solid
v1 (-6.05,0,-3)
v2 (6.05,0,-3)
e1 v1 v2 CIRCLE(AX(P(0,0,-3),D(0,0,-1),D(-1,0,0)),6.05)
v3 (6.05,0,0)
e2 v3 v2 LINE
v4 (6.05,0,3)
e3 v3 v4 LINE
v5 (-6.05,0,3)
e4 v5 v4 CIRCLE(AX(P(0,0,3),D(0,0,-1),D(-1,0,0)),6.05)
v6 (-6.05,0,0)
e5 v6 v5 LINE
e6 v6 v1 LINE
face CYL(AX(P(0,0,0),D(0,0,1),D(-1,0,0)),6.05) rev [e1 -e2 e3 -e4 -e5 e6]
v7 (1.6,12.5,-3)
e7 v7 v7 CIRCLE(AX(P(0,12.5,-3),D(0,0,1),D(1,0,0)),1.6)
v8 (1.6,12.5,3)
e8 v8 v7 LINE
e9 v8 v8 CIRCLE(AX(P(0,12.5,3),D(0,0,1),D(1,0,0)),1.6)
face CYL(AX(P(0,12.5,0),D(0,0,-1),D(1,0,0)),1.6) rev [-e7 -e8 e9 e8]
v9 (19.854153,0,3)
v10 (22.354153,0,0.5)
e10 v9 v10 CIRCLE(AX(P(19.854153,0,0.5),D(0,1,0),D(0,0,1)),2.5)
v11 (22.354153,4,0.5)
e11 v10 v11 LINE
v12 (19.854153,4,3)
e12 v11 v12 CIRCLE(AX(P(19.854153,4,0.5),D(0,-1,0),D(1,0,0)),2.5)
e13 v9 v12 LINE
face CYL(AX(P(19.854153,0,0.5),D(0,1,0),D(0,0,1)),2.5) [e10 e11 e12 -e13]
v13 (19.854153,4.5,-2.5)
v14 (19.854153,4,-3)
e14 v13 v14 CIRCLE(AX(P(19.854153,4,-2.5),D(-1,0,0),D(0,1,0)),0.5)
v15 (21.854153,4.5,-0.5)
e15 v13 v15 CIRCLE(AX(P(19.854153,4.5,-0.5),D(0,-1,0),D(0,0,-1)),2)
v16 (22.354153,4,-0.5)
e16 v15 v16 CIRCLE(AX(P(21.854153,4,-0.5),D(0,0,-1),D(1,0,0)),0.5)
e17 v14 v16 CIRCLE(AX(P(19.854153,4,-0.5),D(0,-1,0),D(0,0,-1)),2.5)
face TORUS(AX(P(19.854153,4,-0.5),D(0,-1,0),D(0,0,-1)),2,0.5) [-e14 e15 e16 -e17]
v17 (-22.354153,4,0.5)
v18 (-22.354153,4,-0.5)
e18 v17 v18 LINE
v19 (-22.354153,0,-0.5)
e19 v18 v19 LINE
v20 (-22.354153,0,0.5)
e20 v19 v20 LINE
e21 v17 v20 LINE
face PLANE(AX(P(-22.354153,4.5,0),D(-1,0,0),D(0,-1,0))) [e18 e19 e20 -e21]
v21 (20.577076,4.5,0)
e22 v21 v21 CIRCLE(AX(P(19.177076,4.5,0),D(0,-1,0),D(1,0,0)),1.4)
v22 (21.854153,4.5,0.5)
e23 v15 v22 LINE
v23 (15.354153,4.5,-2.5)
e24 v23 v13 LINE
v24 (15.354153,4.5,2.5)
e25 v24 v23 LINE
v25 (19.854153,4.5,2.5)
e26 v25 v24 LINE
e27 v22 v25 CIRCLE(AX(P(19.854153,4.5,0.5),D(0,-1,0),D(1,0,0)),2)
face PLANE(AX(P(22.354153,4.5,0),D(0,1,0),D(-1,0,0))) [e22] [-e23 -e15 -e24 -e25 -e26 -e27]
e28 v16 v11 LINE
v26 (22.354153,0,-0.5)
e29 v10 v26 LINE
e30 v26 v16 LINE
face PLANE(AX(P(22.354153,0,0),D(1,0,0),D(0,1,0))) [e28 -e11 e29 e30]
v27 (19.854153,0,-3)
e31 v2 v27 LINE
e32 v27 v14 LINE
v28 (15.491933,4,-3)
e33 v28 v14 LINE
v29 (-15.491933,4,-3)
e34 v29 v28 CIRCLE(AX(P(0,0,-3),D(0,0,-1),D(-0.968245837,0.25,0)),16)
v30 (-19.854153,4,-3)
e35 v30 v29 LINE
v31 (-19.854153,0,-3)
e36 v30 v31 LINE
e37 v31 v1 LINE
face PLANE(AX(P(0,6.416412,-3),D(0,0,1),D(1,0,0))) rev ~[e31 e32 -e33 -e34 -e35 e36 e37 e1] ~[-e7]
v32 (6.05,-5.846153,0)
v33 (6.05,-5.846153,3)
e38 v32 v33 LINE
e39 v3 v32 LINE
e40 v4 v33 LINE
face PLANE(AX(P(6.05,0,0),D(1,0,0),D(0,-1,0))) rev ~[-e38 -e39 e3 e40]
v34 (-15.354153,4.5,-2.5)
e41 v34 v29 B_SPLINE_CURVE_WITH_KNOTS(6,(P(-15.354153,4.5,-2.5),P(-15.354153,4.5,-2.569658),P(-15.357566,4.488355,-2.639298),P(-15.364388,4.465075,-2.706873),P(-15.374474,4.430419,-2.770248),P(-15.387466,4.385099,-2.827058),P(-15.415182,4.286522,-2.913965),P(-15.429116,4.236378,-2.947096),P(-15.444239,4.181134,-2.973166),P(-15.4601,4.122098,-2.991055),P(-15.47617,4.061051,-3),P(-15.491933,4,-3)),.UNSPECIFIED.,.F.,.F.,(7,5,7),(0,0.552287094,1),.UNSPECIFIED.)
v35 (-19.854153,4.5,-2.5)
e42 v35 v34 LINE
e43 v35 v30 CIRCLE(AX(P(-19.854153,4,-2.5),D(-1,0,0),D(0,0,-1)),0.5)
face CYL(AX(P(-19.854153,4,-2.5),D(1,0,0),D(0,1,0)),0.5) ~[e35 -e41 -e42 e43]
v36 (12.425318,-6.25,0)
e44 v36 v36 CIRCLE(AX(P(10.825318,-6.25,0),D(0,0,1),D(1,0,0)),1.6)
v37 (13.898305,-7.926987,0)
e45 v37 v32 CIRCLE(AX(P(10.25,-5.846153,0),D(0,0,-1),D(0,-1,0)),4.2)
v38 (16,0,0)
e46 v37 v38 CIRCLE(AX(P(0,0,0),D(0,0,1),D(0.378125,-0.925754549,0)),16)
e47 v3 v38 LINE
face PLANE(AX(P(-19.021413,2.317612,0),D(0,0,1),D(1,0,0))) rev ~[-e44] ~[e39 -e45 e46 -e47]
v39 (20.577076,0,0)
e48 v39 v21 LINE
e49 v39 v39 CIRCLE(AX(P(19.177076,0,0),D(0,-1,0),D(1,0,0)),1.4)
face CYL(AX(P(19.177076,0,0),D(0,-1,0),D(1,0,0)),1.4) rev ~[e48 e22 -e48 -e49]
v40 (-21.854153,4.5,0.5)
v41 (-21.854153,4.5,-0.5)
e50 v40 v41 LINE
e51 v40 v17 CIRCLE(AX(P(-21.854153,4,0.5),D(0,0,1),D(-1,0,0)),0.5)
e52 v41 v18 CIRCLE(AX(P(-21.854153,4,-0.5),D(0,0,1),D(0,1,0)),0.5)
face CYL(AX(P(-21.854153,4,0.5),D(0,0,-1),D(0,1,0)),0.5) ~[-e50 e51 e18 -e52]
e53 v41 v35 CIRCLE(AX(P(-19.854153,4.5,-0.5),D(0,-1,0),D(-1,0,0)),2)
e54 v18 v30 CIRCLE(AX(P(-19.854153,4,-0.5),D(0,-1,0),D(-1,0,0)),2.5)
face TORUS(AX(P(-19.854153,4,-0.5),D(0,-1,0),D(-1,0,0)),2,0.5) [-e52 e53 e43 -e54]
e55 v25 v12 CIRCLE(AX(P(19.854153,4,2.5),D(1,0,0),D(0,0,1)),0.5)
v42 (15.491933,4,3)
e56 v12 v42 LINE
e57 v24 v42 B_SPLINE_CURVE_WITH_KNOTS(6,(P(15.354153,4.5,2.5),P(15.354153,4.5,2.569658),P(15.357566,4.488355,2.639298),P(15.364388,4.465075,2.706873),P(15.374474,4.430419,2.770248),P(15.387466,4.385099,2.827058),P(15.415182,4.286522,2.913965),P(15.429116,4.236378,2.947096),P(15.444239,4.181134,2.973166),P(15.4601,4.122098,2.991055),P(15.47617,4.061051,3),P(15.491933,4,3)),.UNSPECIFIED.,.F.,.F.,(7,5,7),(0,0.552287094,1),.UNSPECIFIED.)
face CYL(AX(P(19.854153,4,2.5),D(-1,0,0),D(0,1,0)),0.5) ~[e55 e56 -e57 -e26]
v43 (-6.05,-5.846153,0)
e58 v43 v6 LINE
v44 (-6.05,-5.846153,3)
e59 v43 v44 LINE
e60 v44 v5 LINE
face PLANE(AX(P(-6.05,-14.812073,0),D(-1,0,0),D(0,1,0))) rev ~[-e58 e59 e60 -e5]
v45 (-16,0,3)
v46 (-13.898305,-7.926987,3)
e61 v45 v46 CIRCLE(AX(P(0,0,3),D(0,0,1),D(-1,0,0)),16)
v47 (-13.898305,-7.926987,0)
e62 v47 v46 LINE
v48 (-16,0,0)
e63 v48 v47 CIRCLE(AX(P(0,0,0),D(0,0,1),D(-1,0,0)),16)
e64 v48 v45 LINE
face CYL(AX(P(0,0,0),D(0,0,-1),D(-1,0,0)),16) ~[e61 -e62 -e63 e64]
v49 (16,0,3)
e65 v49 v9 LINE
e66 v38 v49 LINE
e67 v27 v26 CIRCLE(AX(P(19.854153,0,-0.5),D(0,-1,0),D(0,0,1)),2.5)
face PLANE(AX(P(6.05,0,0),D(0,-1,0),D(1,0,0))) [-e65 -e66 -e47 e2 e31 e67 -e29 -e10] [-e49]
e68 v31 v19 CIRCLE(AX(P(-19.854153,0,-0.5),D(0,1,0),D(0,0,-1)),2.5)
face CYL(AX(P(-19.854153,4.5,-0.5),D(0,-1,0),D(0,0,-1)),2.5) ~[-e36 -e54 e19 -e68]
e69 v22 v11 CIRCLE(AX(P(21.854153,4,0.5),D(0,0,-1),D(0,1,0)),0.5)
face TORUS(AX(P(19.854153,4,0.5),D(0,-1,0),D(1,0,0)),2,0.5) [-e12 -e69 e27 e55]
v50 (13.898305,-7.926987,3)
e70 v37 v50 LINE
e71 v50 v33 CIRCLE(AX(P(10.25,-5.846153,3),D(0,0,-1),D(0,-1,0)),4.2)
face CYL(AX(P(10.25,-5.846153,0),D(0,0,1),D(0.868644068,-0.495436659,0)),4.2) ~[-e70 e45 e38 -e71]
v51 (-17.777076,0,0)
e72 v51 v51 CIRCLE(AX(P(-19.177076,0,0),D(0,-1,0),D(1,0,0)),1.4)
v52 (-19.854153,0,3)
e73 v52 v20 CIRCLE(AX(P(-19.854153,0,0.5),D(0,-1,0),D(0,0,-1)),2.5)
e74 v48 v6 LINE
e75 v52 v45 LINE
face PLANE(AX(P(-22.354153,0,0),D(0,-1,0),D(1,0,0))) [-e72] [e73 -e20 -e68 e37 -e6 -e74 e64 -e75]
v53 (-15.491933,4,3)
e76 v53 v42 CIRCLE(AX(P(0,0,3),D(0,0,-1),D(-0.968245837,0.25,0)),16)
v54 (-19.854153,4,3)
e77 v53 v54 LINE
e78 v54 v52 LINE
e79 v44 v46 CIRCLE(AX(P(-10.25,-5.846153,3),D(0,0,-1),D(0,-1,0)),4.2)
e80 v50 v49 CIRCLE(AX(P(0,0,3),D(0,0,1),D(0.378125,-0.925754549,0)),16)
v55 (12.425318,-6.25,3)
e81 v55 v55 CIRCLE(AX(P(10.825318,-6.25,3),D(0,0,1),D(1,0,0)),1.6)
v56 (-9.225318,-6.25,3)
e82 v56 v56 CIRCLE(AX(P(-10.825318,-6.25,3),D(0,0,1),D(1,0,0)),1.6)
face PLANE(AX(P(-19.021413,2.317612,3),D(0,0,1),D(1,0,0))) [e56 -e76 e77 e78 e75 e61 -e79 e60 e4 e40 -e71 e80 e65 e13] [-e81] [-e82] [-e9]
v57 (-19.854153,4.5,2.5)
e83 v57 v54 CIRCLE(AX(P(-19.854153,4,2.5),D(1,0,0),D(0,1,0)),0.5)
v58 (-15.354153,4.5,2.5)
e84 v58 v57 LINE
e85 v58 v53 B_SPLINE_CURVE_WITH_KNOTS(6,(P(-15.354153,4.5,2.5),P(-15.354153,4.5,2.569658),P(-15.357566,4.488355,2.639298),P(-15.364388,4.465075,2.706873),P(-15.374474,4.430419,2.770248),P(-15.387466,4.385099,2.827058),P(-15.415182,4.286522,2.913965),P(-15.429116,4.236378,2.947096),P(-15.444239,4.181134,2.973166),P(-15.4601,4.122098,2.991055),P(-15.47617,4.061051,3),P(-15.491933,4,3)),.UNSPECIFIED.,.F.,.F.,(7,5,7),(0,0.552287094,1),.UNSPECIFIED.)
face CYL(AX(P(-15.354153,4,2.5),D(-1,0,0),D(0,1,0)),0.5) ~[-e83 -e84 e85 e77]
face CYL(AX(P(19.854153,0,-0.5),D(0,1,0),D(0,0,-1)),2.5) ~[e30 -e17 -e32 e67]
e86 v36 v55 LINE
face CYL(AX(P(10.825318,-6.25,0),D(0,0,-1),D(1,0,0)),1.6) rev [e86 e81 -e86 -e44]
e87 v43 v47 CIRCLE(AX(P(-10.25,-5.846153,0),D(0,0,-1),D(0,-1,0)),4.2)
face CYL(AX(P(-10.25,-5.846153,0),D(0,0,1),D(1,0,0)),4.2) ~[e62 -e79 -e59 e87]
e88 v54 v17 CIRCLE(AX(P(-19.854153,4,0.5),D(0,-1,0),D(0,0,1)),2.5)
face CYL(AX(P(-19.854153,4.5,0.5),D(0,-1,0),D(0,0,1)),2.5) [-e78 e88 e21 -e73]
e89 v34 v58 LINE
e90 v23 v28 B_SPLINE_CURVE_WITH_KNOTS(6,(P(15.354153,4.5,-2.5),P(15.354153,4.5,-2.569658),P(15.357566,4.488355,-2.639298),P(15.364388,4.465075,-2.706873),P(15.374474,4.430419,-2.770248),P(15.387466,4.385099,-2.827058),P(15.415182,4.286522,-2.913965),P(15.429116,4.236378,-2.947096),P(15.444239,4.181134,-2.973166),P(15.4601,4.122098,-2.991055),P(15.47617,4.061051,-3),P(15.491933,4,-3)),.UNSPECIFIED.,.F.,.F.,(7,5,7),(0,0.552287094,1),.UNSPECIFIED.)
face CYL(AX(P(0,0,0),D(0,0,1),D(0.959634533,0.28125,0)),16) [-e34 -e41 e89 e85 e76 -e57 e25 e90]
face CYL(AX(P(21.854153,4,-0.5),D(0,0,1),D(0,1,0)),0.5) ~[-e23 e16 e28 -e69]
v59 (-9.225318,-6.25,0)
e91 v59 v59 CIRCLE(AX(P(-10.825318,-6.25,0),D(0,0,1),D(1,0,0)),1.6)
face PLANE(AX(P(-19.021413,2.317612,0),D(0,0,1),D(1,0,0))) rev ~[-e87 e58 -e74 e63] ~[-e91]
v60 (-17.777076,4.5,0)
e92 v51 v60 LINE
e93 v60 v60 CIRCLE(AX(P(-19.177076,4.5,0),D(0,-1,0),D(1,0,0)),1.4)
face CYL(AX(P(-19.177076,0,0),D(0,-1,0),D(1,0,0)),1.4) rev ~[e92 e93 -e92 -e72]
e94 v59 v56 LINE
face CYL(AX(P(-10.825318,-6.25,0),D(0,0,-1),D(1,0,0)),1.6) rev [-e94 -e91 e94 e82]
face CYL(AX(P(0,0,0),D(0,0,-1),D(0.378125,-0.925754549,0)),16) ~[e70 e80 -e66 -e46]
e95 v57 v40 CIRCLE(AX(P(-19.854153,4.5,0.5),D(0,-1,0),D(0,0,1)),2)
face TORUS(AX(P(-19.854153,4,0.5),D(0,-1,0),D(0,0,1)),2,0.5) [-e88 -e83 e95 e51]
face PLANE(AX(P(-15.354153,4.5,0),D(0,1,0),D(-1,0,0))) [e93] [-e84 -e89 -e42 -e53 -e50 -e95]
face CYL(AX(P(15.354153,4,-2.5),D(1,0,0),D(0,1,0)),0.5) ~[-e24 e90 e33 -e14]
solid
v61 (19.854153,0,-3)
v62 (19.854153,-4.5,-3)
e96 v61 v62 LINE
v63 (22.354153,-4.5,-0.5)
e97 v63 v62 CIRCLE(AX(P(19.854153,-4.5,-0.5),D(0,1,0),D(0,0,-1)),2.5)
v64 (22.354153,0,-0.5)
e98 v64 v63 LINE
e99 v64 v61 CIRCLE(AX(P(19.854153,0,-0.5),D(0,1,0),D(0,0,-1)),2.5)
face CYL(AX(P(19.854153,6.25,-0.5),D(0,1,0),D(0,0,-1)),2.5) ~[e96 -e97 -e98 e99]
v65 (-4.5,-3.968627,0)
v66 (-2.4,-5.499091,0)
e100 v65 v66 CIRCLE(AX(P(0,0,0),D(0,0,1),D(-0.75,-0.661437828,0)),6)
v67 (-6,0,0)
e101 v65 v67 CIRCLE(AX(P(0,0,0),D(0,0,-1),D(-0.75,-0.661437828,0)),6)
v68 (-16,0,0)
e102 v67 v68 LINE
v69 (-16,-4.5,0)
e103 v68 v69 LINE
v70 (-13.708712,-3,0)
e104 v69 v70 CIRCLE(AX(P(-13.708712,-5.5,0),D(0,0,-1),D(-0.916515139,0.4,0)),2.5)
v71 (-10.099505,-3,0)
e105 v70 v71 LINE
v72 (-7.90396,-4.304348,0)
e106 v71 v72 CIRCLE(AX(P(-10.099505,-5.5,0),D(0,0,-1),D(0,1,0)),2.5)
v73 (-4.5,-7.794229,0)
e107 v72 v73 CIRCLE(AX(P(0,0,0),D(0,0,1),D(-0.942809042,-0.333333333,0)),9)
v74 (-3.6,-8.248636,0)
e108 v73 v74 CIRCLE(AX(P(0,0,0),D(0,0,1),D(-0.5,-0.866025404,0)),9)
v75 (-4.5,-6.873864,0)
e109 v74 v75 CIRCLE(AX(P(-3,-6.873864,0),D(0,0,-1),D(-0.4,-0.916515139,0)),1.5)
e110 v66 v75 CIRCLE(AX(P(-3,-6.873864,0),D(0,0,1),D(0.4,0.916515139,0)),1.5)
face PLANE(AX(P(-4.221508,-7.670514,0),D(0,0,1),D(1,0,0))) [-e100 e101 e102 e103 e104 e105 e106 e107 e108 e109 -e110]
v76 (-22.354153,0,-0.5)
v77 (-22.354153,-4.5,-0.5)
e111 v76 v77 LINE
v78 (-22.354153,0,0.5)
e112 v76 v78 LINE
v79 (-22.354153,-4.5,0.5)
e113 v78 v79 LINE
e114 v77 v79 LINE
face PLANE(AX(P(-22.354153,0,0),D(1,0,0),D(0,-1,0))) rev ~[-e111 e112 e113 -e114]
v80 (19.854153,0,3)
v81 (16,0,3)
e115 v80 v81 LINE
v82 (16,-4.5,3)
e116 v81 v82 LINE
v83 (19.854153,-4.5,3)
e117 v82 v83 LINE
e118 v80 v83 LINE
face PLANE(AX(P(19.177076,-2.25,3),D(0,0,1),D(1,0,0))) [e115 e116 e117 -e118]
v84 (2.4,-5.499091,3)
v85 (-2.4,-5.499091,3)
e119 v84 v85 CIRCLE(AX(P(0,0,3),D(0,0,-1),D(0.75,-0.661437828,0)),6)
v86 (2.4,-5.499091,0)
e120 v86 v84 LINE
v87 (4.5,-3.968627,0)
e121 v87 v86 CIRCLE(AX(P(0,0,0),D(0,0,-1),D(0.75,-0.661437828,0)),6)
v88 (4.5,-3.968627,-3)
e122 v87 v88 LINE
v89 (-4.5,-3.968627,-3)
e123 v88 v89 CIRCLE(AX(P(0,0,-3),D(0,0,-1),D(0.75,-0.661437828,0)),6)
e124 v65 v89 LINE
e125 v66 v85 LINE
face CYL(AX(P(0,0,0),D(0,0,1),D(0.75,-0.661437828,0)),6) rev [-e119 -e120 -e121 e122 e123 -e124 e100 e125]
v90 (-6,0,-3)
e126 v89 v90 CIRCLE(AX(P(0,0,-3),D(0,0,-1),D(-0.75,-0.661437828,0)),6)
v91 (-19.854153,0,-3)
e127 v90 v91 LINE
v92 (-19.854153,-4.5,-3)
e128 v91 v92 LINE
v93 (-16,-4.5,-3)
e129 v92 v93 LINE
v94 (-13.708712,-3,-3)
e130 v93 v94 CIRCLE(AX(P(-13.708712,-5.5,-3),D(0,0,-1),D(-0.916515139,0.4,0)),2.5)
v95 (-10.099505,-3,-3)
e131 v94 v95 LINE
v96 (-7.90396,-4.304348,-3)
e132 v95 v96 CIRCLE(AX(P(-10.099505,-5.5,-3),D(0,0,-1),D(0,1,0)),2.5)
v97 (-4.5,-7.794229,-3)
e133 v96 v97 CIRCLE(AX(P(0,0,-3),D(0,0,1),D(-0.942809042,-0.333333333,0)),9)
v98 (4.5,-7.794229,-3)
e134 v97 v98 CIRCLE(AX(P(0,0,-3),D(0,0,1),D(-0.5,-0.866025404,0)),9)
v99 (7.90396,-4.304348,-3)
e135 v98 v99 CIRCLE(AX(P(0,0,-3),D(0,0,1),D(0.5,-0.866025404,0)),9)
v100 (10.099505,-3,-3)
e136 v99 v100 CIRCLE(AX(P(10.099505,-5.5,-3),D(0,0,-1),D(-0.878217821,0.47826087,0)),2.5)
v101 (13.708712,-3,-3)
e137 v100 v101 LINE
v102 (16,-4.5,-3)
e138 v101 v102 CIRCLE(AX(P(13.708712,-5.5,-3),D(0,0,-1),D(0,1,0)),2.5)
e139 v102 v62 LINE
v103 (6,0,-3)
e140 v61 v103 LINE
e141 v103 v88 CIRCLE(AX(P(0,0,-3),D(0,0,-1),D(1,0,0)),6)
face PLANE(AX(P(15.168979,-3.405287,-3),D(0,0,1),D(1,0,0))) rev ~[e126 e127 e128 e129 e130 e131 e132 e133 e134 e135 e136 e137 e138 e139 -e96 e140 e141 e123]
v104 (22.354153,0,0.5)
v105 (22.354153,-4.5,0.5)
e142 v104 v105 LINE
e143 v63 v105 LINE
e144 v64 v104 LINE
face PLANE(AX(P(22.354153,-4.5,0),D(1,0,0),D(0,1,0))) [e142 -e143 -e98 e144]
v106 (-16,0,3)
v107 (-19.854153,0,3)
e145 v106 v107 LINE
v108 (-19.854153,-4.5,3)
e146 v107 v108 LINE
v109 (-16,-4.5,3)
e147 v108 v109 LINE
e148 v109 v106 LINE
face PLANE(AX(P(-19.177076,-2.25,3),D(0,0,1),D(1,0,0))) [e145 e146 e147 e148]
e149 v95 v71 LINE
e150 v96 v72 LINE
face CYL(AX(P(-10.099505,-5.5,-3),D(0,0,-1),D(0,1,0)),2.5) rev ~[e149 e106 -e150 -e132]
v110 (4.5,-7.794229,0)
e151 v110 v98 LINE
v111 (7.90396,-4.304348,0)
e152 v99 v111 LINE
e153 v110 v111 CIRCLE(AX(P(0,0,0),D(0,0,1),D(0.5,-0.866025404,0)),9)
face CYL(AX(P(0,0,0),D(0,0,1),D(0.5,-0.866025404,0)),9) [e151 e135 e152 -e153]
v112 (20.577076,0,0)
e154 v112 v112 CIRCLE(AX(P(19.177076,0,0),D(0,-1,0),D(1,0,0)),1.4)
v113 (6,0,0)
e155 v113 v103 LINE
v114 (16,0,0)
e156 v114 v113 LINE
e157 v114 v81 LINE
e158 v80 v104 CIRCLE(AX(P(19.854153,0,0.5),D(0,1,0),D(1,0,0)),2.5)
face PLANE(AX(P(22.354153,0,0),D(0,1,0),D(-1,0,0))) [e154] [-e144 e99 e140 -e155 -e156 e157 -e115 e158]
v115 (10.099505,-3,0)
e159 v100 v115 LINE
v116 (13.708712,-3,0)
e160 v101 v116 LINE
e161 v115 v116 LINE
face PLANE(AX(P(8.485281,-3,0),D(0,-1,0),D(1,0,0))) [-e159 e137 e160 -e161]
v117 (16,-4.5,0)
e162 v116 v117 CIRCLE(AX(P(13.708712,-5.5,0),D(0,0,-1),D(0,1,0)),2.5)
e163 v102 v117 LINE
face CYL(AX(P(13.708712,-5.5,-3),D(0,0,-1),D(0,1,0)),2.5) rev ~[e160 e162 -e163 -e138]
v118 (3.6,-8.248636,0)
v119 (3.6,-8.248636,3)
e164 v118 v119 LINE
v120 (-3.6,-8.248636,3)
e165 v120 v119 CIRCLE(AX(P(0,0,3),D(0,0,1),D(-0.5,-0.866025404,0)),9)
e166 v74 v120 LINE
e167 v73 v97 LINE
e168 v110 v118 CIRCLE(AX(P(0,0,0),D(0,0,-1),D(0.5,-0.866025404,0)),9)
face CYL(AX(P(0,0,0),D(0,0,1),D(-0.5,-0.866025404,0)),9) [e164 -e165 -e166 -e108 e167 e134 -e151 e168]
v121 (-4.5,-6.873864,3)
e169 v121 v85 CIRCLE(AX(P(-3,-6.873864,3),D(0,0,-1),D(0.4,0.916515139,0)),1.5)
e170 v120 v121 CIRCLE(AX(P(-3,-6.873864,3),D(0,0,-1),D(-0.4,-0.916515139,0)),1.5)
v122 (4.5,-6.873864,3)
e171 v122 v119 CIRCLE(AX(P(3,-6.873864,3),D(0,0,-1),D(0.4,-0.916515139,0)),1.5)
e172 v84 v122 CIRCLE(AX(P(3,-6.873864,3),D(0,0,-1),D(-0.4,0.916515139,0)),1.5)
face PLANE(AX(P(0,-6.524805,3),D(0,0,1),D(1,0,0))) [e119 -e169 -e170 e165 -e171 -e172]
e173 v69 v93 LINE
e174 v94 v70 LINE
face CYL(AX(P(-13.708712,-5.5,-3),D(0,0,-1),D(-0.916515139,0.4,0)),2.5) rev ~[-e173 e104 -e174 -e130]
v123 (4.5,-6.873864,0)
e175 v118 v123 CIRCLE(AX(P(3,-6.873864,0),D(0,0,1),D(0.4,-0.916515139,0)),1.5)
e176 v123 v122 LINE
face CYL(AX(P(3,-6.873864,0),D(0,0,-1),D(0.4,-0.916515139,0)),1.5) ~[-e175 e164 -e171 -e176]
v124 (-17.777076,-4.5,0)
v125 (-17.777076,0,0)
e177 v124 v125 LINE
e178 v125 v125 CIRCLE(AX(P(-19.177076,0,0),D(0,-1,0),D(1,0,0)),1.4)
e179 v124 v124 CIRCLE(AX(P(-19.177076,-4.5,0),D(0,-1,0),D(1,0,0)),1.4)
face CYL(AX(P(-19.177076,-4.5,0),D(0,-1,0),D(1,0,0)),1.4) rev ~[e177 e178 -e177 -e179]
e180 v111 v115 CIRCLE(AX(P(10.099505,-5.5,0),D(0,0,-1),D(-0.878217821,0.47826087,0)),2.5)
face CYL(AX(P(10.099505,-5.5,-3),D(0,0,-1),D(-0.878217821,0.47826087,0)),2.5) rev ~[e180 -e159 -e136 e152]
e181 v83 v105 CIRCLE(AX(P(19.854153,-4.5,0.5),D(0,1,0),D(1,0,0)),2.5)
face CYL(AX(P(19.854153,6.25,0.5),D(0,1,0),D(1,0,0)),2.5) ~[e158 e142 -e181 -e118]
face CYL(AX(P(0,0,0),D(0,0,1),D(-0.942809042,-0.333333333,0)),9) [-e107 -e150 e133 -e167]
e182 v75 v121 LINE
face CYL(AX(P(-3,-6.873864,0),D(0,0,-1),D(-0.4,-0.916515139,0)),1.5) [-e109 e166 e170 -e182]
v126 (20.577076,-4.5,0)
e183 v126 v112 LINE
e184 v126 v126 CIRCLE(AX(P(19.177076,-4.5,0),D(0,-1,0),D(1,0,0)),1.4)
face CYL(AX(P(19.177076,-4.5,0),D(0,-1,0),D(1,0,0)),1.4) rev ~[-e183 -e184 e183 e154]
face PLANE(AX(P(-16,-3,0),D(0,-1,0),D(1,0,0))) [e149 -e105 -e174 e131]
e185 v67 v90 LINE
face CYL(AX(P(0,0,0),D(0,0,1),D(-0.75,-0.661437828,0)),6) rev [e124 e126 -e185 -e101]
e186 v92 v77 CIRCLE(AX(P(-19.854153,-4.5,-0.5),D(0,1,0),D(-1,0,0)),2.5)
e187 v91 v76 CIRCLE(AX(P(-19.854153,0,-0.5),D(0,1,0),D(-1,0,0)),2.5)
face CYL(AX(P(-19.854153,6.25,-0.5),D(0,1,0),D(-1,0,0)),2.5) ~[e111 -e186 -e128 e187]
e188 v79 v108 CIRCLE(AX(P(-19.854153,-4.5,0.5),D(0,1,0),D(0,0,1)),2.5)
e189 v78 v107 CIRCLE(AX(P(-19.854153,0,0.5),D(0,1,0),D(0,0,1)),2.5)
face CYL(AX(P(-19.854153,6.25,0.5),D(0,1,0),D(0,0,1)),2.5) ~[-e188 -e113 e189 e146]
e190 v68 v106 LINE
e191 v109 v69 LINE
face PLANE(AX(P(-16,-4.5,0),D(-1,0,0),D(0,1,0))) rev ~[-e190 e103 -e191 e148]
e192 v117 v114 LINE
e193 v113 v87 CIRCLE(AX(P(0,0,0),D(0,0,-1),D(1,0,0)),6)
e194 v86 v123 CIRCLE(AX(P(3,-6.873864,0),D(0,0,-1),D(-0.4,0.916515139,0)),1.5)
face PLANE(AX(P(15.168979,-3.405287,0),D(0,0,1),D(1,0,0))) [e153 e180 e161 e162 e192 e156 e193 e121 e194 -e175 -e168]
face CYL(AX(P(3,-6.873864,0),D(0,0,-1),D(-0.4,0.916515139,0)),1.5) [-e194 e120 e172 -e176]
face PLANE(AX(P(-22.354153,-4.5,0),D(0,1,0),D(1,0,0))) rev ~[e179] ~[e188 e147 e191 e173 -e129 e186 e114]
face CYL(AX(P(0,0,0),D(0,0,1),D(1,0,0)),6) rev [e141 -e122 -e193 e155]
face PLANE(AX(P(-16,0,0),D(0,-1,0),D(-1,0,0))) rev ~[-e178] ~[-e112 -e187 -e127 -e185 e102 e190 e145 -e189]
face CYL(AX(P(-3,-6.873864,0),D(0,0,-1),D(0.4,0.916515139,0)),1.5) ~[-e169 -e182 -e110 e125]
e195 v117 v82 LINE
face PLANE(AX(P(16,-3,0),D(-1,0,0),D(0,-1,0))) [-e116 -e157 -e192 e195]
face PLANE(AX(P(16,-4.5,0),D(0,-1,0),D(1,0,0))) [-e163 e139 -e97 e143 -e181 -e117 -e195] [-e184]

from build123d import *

# Parameters (mm, degrees)
F0_R          = 1.6
F1_DEPTH      = 3
F2_DEPTH      = 3
F3_R          = 1.4
F4_DEPTH      = 16.001
F5_R          = 2.5
F6_R          = 0.5
F7_R          = 4.2
F9_DEPTH      = 3
F10_DEPTH     = 3
F11_R         = 1.4
F12_DEPTH     = 25
F13_T1_DEPTH  = 3
F13_T3_DEPTH  = 3
F13_T5_DEPTH  = 3
F13_T7_DEPTH  = 3
F13_T9_DEPTH  = 17
F13_T11_DEPTH = 17
F13_T13_DEPTH = 17
F13_T15_DEPTH = 17
F14_T1_DEPTH  = 10.2630914396
F14_T3_DEPTH  = 5.5205236091


# Not quite as in the source:
# - a fillet or chamfer that OpenCascade refuses, or shapes differently, is made with other operations: its cross-section is extruded or revolved along the edge and cut away or added


with BuildPart() as f1:
    # F0 (on Top) → F1 (new body)
    with BuildSketch(Plane.XY):
        with BuildLine():
            ThreePointArc((-16, 0), (-15.8377151213, 2.273055155), (-15.3541525328, 4.5))
            Line((-15.3541525328, 4.5), (-22.3541525328, 4.5))
            Line((-22.3541525328, 4.5), (-22.3541525328, 0))
            Line((-22.3541525328, 0), (-16, 0))
        make_face()
        with BuildLine():
            Line((7.65, 0), (16, 0))
            ThreePointArc((16, 0), (15.8377151213, 2.273055155), (15.3541525328, 4.5))
            ThreePointArc((15.3541525328, 4.5), (0, 16), (-15.3541525328, 4.5))
            ThreePointArc((-15.3541525328, 4.5), (-15.8377151213, 2.273055155), (-16, 0))
            Line((-16, 0), (-7.65, 0))
            ThreePointArc((-7.65, 0), (0, 7.65), (7.65, 0))
        make_face()
        with Locations((0, 12.5)):
            Circle(F0_R, mode=Mode.SUBTRACT)
        with BuildLine():
            ThreePointArc((-6.05, 0), (0, 6.05), (6.05, 0))
            Line((6.05, 0), (7.65, 0))
            ThreePointArc((7.65, 0), (0, 7.65), (-7.65, 0))
            Line((-7.65, 0), (-6.05, 0))
        make_face()
        with BuildLine():
            ThreePointArc((15.3541525328, 4.5), (15.8377151213, 2.273055155), (16, 0))
            Line((16, 0), (22.3541525328, 0))
            Line((22.3541525328, 0), (22.3541525328, 4.5))
            Line((22.3541525328, 4.5), (15.3541525328, 4.5))
        make_face()
        with BuildLine():
            Line((-6.05, -14.8120727786), (-6.05, 0))
            Line((-6.05, 0), (-7.65, 0))
            Line((-7.65, 0), (-16, 0))
            ThreePointArc((-16, 0), (-13.2815661727, -8.9218832093), (-6.05, -14.8120727786))
        make_face()
        with Locations((-10.8253175473, -6.25)):
            Circle(F0_R, mode=Mode.SUBTRACT)
        with BuildLine():
            Line((6.05, 0), (6.05, -14.8120727786))
            ThreePointArc((6.05, -14.8120727786), (13.2815661727, -8.9218832093), (16, 0))
            Line((16, 0), (7.65, 0))
            Line((7.65, 0), (6.05, 0))
        make_face()
        with Locations((10.8253175473, -6.25)):
            Circle(F0_R, mode=Mode.SUBTRACT)
    extrude(amount=F1_DEPTH)

    # F0 (on Top) → F2 (join)
    with BuildSketch(Plane.XY):
        with BuildLine():
            Line((7.65, 0), (16, 0))
            ThreePointArc((16, 0), (15.8377151213, 2.273055155), (15.3541525328, 4.5))
            ThreePointArc((15.3541525328, 4.5), (0, 16), (-15.3541525328, 4.5))
            ThreePointArc((-15.3541525328, 4.5), (-15.8377151213, 2.273055155), (-16, 0))
            Line((-16, 0), (-7.65, 0))
            ThreePointArc((-7.65, 0), (0, 7.65), (7.65, 0))
        make_face()
        with Locations((0, 12.5)):
            Circle(F0_R, mode=Mode.SUBTRACT)
        with BuildLine():
            ThreePointArc((-6.05, 0), (0, 6.05), (6.05, 0))
            Line((6.05, 0), (7.65, 0))
            ThreePointArc((7.65, 0), (0, 7.65), (-7.65, 0))
            Line((-7.65, 0), (-6.05, 0))
        make_face()
        with BuildLine():
            ThreePointArc((15.3541525328, 4.5), (15.8377151213, 2.273055155), (16, 0))
            Line((16, 0), (22.3541525328, 0))
            Line((22.3541525328, 0), (22.3541525328, 4.5))
            Line((22.3541525328, 4.5), (15.3541525328, 4.5))
        make_face()
        with BuildLine():
            ThreePointArc((-16, 0), (-15.8377151213, 2.273055155), (-15.3541525328, 4.5))
            Line((-15.3541525328, 4.5), (-22.3541525328, 4.5))
            Line((-22.3541525328, 4.5), (-22.3541525328, 0))
            Line((-22.3541525328, 0), (-16, 0))
        make_face()
    extrude(amount=-F2_DEPTH)

    # F3 (on face) → F4 (cut, through all)
    with BuildSketch(Plane.XZ):
        with Locations((19.1770762664, 0)):
            Circle(F3_R)
        with Locations((-19.1770762664, 0)):
            Circle(F3_R)
    extrude(amount=-F4_DEPTH, mode=Mode.SUBTRACT)

    # F5
    f5_edges = [f1.edges().sort_by_distance(p)[0] for p in [
        (-22.354153, 2.25, 3),
        (22.354153, 2.25, 3),
        (-22.354153, 2.25, -3),
        (22.354153, 2.25, -3),
    ]]
    fillet(f5_edges, radius=F5_R)

    # F6
    f6_edges = [f1.edges().sort_by_distance(p)[0] for p in [
        (-17.604153, 4.5, 3),
        (17.604153, 4.5, 3),
        (-21.621919, 4.5, 2.267767),
        (-22.354153, 4.5, 0),
        (-17.604153, 4.5, -3),
        (-21.621919, 4.5, -2.267767),
        (17.604153, 4.5, -3),
        (22.354153, 4.5, 0),
        (21.621919, 4.5, 2.267767),
        (21.621919, 4.5, -2.267767),
    ]]
    fillet(f6_edges, radius=F6_R)

    # F7
    f7_edges = [f1.edges().sort_by_distance(p)[0] for p in [
        (-6.05, -14.812073, 1.5),
        (6.05, -14.812073, 1.5),
    ]]
    fillet(f7_edges, radius=F7_R)


with BuildPart() as f9:
    # F8 (on Top) → F9 (new body)
    with BuildSketch(Plane.XY):
        with BuildLine():
            ThreePointArc((-4.5, -3.9686269666), (-5.6124860802, -2.1213203436), (-6, 0))
            Line((-6, 0), (-9, 0))
            ThreePointArc((-9, 0), (-8.8703870369, -1.5219178085), (-8.4852813742, -3))
            ThreePointArc((-8.4852813742, -3), (-6.9210216111, -5.7532130031), (-4.5, -7.7942286341))
            Line((-4.5, -7.7942286341), (-4.5, -3.9686269666))
        make_face()
        with BuildLine():
            ThreePointArc((4.5, -3.9686269666), (0, -6), (-4.5, -3.9686269666))
            Line((-4.5, -3.9686269666), (-4.5, -7.7942286341))
            ThreePointArc((-4.5, -7.7942286341), (0, -9), (4.5, -7.7942286341))
            Line((4.5, -7.7942286341), (4.5, -3.9686269666))
        make_face()
        with BuildLine():
            ThreePointArc((-8.4852813742, -3), (-8.8703870369, -1.5219178085), (-9, 0))
            Line((-9, 0), (-16, 0))
            Line((-16, 0), (-16, -3))
            Line((-16, -3), (-8.4852813742, -3))
        make_face()
        with BuildLine():
            ThreePointArc((6, 0), (5.6124860802, -2.1213203436), (4.5, -3.9686269666))
            Line((4.5, -3.9686269666), (4.5, -7.7942286341))
            ThreePointArc((4.5, -7.7942286341), (6.9210216111, -5.7532130031), (8.4852813742, -3))
            ThreePointArc((8.4852813742, -3), (8.8703870369, -1.5219178085), (9, 0))
            Line((9, 0), (6, 0))
        make_face()
        Polygon((-16, -3), (-16, 0), (-22.3541525328, 0), (-22.3541525328, -4.5), (-16, -4.5), align=None)
        with BuildLine():
            Line((16, 0), (9, 0))
            ThreePointArc((9, 0), (8.8703870369, -1.5219178085), (8.4852813742, -3))
            Line((8.4852813742, -3), (16, -3))
            Line((16, -3), (16, 0))
        make_face()
        Polygon((22.3541525328, 0), (16, 0), (16, -3), (16, -4.5), (22.3541525328, -4.5), align=None)
    extrude(amount=-F9_DEPTH)

    # F8 (on Top) → F10 (join)
    with BuildSketch(Plane.XY):
        Polygon((-16, -3), (-16, 0), (-22.3541525328, 0), (-22.3541525328, -4.5), (-16, -4.5), align=None)
        Polygon((22.3541525328, 0), (16, 0), (16, -3), (16, -4.5), (22.3541525328, -4.5), align=None)
        with BuildLine():
            ThreePointArc((4.5, -3.9686269666), (0, -6), (-4.5, -3.9686269666))
            Line((-4.5, -3.9686269666), (-4.5, -7.7942286341))
            ThreePointArc((-4.5, -7.7942286341), (0, -9), (4.5, -7.7942286341))
            Line((4.5, -7.7942286341), (4.5, -3.9686269666))
        make_face()
    extrude(amount=F10_DEPTH)

    # F11 (on face) → F12 (cut)
    with BuildSketch(Plane.XZ.offset(4.5)):
        with Locations((-19.1770762664, 0)):
            Circle(F11_R)
        with Locations((19.1770762664, 0)):
            Circle(F11_R)
    extrude(amount=-F12_DEPTH, mode=Mode.SUBTRACT)

    # F13: fillet of radius 2.5 on 8 edges, made by hand

    # F13_s2 → F13_t1 (join)
    with BuildSketch(Plane.XY.offset(-3)):
        with BuildLine():
            ThreePointArc((-16, -4.5), (-15.0780185463, -3.4083499337), (-13.7087121525, -3))
            Line((-13.7087121525, -3), (-16, -3))
            Line((-16, -3), (-16, -4.5))
        make_face()
    extrude(amount=F13_T1_DEPTH)

    # F13_s4 → F13_t3 (join)
    with BuildSketch(Plane.XY.offset(-3)):
        with BuildLine():
            ThreePointArc((-10.0995049384, -3), (-8.8226201422, -3.3506826159), (-7.9039603865, -4.3043478261))
            ThreePointArc((-7.9039603865, -4.3043478261), (-8.220531746, -3.6637218527), (-8.4852813742, -3))
            Line((-8.4852813742, -3), (-10.0995049384, -3))
        make_face()
    extrude(amount=F13_T3_DEPTH)

    # F13_s6 → F13_t5 (join)
    with BuildSketch(Plane.XY.offset(-3)):
        with BuildLine():
            ThreePointArc((7.9039603865, -4.3043478261), (8.8226201422, -3.3506826159), (10.0995049384, -3))
            Line((10.0995049384, -3), (8.4852813742, -3))
            ThreePointArc((8.4852813742, -3), (8.220531746, -3.6637218527), (7.9039603865, -4.3043478261))
        make_face()
    extrude(amount=F13_T5_DEPTH)

    # F13_s8 → F13_t7 (join)
    with BuildSketch(Plane.XY.offset(-3)):
        with BuildLine():
            ThreePointArc((13.7087121525, -3), (15.0780185463, -3.4083499337), (16, -4.5))
            Line((16, -4.5), (16, -3))
            Line((16, -3), (13.7087121525, -3))
        make_face()
    extrude(amount=F13_T7_DEPTH)

    # F13_s10 → F13_t9 (cut)
    with BuildSketch(Plane.XZ.offset(-6.25)):
        with BuildLine():
            ThreePointArc((-22.3541525328, -0.5), (-21.6219194858, -2.267766953), (-19.8541525328, -3))
            Line((-19.8541525328, -3), (-22.3541525328, -3))
            Line((-22.3541525328, -3), (-22.3541525328, -0.5))
        make_face()
    extrude(amount=F13_T9_DEPTH, mode=Mode.SUBTRACT)

    # F13_s12 → F13_t11 (cut)
    with BuildSketch(Plane.XZ.offset(-6.25)):
        with BuildLine():
            ThreePointArc((19.8541525328, -3), (21.6219194858, -2.267766953), (22.3541525328, -0.5))
            Line((22.3541525328, -0.5), (22.3541525328, -3))
            Line((22.3541525328, -3), (19.8541525328, -3))
        make_face()
    extrude(amount=F13_T11_DEPTH, mode=Mode.SUBTRACT)

    # F13_s14 → F13_t13 (cut)
    with BuildSketch(Plane.XZ.offset(-6.25)):
        with BuildLine():
            ThreePointArc((-19.8541525328, 3), (-21.6219194858, 2.267766953), (-22.3541525328, 0.5))
            Line((-22.3541525328, 0.5), (-22.3541525328, 3))
            Line((-22.3541525328, 3), (-19.8541525328, 3))
        make_face()
    extrude(amount=F13_T13_DEPTH, mode=Mode.SUBTRACT)

    # F13_s16 → F13_t15 (cut)
    with BuildSketch(Plane.XZ.offset(-6.25)):
        with BuildLine():
            ThreePointArc((22.3541525328, 0.5), (21.6219194858, 2.267766953), (19.8541525328, 3))
            Line((19.8541525328, 3), (22.3541525328, 3))
            Line((22.3541525328, 3), (22.3541525328, 0.5))
        make_face()
    extrude(amount=F13_T15_DEPTH, mode=Mode.SUBTRACT)

    # F14: fillet of radius 1.5 on 4 edges, made by hand

    # F14_s2 → F14_t1 (cut)
    with BuildSketch(Plane.XY):
        with BuildLine():
            ThreePointArc((-2.4, -5.4990908339), (-3.8215838363, -5.6188735026), (-4.5, -6.8738635424))
            Line((-4.5, -6.8738635424), (-4.5, -3.9686269666))
            ThreePointArc((-4.5, -3.9686269666), (-3.5338477489, -4.8489091647), (-2.4, -5.4990908339))
        make_face()
        with BuildLine():
            ThreePointArc((2.4, -5.4990908339), (3.8215838363, -5.6188735026), (4.5, -6.8738635424))
            Line((4.5, -6.8738635424), (4.5, -3.9686269666))
            ThreePointArc((4.5, -3.9686269666), (3.5338477489, -4.8489091647), (2.4, -5.4990908339))
        make_face()
    extrude(amount=F14_T1_DEPTH, mode=Mode.SUBTRACT)

    # F14_s4 → F14_t3 (cut)
    with BuildSketch(Plane.XY):
        with BuildLine():
            ThreePointArc((-3.6, -8.2486362509), (-4.2549900398, -7.6954473787), (-4.5, -6.8738635424))
            Line((-4.5, -6.8738635424), (-4.5, -7.7942286341))
            ThreePointArc((-4.5, -7.7942286341), (-4.056368027, -8.0340449606), (-3.6, -8.2486362509))
        make_face()
        with BuildLine():
            ThreePointArc((3.6, -8.2486362509), (4.2549900398, -7.6954473787), (4.5, -6.8738635424))
            Line((4.5, -6.8738635424), (4.5, -7.7942286341))
            ThreePointArc((4.5, -7.7942286341), (4.056368027, -8.0340449606), (3.6, -8.2486362509))
        make_face()
    extrude(amount=F14_T3_DEPTH, mode=Mode.SUBTRACT)


solid = Compound([f1.part, f9.part])
